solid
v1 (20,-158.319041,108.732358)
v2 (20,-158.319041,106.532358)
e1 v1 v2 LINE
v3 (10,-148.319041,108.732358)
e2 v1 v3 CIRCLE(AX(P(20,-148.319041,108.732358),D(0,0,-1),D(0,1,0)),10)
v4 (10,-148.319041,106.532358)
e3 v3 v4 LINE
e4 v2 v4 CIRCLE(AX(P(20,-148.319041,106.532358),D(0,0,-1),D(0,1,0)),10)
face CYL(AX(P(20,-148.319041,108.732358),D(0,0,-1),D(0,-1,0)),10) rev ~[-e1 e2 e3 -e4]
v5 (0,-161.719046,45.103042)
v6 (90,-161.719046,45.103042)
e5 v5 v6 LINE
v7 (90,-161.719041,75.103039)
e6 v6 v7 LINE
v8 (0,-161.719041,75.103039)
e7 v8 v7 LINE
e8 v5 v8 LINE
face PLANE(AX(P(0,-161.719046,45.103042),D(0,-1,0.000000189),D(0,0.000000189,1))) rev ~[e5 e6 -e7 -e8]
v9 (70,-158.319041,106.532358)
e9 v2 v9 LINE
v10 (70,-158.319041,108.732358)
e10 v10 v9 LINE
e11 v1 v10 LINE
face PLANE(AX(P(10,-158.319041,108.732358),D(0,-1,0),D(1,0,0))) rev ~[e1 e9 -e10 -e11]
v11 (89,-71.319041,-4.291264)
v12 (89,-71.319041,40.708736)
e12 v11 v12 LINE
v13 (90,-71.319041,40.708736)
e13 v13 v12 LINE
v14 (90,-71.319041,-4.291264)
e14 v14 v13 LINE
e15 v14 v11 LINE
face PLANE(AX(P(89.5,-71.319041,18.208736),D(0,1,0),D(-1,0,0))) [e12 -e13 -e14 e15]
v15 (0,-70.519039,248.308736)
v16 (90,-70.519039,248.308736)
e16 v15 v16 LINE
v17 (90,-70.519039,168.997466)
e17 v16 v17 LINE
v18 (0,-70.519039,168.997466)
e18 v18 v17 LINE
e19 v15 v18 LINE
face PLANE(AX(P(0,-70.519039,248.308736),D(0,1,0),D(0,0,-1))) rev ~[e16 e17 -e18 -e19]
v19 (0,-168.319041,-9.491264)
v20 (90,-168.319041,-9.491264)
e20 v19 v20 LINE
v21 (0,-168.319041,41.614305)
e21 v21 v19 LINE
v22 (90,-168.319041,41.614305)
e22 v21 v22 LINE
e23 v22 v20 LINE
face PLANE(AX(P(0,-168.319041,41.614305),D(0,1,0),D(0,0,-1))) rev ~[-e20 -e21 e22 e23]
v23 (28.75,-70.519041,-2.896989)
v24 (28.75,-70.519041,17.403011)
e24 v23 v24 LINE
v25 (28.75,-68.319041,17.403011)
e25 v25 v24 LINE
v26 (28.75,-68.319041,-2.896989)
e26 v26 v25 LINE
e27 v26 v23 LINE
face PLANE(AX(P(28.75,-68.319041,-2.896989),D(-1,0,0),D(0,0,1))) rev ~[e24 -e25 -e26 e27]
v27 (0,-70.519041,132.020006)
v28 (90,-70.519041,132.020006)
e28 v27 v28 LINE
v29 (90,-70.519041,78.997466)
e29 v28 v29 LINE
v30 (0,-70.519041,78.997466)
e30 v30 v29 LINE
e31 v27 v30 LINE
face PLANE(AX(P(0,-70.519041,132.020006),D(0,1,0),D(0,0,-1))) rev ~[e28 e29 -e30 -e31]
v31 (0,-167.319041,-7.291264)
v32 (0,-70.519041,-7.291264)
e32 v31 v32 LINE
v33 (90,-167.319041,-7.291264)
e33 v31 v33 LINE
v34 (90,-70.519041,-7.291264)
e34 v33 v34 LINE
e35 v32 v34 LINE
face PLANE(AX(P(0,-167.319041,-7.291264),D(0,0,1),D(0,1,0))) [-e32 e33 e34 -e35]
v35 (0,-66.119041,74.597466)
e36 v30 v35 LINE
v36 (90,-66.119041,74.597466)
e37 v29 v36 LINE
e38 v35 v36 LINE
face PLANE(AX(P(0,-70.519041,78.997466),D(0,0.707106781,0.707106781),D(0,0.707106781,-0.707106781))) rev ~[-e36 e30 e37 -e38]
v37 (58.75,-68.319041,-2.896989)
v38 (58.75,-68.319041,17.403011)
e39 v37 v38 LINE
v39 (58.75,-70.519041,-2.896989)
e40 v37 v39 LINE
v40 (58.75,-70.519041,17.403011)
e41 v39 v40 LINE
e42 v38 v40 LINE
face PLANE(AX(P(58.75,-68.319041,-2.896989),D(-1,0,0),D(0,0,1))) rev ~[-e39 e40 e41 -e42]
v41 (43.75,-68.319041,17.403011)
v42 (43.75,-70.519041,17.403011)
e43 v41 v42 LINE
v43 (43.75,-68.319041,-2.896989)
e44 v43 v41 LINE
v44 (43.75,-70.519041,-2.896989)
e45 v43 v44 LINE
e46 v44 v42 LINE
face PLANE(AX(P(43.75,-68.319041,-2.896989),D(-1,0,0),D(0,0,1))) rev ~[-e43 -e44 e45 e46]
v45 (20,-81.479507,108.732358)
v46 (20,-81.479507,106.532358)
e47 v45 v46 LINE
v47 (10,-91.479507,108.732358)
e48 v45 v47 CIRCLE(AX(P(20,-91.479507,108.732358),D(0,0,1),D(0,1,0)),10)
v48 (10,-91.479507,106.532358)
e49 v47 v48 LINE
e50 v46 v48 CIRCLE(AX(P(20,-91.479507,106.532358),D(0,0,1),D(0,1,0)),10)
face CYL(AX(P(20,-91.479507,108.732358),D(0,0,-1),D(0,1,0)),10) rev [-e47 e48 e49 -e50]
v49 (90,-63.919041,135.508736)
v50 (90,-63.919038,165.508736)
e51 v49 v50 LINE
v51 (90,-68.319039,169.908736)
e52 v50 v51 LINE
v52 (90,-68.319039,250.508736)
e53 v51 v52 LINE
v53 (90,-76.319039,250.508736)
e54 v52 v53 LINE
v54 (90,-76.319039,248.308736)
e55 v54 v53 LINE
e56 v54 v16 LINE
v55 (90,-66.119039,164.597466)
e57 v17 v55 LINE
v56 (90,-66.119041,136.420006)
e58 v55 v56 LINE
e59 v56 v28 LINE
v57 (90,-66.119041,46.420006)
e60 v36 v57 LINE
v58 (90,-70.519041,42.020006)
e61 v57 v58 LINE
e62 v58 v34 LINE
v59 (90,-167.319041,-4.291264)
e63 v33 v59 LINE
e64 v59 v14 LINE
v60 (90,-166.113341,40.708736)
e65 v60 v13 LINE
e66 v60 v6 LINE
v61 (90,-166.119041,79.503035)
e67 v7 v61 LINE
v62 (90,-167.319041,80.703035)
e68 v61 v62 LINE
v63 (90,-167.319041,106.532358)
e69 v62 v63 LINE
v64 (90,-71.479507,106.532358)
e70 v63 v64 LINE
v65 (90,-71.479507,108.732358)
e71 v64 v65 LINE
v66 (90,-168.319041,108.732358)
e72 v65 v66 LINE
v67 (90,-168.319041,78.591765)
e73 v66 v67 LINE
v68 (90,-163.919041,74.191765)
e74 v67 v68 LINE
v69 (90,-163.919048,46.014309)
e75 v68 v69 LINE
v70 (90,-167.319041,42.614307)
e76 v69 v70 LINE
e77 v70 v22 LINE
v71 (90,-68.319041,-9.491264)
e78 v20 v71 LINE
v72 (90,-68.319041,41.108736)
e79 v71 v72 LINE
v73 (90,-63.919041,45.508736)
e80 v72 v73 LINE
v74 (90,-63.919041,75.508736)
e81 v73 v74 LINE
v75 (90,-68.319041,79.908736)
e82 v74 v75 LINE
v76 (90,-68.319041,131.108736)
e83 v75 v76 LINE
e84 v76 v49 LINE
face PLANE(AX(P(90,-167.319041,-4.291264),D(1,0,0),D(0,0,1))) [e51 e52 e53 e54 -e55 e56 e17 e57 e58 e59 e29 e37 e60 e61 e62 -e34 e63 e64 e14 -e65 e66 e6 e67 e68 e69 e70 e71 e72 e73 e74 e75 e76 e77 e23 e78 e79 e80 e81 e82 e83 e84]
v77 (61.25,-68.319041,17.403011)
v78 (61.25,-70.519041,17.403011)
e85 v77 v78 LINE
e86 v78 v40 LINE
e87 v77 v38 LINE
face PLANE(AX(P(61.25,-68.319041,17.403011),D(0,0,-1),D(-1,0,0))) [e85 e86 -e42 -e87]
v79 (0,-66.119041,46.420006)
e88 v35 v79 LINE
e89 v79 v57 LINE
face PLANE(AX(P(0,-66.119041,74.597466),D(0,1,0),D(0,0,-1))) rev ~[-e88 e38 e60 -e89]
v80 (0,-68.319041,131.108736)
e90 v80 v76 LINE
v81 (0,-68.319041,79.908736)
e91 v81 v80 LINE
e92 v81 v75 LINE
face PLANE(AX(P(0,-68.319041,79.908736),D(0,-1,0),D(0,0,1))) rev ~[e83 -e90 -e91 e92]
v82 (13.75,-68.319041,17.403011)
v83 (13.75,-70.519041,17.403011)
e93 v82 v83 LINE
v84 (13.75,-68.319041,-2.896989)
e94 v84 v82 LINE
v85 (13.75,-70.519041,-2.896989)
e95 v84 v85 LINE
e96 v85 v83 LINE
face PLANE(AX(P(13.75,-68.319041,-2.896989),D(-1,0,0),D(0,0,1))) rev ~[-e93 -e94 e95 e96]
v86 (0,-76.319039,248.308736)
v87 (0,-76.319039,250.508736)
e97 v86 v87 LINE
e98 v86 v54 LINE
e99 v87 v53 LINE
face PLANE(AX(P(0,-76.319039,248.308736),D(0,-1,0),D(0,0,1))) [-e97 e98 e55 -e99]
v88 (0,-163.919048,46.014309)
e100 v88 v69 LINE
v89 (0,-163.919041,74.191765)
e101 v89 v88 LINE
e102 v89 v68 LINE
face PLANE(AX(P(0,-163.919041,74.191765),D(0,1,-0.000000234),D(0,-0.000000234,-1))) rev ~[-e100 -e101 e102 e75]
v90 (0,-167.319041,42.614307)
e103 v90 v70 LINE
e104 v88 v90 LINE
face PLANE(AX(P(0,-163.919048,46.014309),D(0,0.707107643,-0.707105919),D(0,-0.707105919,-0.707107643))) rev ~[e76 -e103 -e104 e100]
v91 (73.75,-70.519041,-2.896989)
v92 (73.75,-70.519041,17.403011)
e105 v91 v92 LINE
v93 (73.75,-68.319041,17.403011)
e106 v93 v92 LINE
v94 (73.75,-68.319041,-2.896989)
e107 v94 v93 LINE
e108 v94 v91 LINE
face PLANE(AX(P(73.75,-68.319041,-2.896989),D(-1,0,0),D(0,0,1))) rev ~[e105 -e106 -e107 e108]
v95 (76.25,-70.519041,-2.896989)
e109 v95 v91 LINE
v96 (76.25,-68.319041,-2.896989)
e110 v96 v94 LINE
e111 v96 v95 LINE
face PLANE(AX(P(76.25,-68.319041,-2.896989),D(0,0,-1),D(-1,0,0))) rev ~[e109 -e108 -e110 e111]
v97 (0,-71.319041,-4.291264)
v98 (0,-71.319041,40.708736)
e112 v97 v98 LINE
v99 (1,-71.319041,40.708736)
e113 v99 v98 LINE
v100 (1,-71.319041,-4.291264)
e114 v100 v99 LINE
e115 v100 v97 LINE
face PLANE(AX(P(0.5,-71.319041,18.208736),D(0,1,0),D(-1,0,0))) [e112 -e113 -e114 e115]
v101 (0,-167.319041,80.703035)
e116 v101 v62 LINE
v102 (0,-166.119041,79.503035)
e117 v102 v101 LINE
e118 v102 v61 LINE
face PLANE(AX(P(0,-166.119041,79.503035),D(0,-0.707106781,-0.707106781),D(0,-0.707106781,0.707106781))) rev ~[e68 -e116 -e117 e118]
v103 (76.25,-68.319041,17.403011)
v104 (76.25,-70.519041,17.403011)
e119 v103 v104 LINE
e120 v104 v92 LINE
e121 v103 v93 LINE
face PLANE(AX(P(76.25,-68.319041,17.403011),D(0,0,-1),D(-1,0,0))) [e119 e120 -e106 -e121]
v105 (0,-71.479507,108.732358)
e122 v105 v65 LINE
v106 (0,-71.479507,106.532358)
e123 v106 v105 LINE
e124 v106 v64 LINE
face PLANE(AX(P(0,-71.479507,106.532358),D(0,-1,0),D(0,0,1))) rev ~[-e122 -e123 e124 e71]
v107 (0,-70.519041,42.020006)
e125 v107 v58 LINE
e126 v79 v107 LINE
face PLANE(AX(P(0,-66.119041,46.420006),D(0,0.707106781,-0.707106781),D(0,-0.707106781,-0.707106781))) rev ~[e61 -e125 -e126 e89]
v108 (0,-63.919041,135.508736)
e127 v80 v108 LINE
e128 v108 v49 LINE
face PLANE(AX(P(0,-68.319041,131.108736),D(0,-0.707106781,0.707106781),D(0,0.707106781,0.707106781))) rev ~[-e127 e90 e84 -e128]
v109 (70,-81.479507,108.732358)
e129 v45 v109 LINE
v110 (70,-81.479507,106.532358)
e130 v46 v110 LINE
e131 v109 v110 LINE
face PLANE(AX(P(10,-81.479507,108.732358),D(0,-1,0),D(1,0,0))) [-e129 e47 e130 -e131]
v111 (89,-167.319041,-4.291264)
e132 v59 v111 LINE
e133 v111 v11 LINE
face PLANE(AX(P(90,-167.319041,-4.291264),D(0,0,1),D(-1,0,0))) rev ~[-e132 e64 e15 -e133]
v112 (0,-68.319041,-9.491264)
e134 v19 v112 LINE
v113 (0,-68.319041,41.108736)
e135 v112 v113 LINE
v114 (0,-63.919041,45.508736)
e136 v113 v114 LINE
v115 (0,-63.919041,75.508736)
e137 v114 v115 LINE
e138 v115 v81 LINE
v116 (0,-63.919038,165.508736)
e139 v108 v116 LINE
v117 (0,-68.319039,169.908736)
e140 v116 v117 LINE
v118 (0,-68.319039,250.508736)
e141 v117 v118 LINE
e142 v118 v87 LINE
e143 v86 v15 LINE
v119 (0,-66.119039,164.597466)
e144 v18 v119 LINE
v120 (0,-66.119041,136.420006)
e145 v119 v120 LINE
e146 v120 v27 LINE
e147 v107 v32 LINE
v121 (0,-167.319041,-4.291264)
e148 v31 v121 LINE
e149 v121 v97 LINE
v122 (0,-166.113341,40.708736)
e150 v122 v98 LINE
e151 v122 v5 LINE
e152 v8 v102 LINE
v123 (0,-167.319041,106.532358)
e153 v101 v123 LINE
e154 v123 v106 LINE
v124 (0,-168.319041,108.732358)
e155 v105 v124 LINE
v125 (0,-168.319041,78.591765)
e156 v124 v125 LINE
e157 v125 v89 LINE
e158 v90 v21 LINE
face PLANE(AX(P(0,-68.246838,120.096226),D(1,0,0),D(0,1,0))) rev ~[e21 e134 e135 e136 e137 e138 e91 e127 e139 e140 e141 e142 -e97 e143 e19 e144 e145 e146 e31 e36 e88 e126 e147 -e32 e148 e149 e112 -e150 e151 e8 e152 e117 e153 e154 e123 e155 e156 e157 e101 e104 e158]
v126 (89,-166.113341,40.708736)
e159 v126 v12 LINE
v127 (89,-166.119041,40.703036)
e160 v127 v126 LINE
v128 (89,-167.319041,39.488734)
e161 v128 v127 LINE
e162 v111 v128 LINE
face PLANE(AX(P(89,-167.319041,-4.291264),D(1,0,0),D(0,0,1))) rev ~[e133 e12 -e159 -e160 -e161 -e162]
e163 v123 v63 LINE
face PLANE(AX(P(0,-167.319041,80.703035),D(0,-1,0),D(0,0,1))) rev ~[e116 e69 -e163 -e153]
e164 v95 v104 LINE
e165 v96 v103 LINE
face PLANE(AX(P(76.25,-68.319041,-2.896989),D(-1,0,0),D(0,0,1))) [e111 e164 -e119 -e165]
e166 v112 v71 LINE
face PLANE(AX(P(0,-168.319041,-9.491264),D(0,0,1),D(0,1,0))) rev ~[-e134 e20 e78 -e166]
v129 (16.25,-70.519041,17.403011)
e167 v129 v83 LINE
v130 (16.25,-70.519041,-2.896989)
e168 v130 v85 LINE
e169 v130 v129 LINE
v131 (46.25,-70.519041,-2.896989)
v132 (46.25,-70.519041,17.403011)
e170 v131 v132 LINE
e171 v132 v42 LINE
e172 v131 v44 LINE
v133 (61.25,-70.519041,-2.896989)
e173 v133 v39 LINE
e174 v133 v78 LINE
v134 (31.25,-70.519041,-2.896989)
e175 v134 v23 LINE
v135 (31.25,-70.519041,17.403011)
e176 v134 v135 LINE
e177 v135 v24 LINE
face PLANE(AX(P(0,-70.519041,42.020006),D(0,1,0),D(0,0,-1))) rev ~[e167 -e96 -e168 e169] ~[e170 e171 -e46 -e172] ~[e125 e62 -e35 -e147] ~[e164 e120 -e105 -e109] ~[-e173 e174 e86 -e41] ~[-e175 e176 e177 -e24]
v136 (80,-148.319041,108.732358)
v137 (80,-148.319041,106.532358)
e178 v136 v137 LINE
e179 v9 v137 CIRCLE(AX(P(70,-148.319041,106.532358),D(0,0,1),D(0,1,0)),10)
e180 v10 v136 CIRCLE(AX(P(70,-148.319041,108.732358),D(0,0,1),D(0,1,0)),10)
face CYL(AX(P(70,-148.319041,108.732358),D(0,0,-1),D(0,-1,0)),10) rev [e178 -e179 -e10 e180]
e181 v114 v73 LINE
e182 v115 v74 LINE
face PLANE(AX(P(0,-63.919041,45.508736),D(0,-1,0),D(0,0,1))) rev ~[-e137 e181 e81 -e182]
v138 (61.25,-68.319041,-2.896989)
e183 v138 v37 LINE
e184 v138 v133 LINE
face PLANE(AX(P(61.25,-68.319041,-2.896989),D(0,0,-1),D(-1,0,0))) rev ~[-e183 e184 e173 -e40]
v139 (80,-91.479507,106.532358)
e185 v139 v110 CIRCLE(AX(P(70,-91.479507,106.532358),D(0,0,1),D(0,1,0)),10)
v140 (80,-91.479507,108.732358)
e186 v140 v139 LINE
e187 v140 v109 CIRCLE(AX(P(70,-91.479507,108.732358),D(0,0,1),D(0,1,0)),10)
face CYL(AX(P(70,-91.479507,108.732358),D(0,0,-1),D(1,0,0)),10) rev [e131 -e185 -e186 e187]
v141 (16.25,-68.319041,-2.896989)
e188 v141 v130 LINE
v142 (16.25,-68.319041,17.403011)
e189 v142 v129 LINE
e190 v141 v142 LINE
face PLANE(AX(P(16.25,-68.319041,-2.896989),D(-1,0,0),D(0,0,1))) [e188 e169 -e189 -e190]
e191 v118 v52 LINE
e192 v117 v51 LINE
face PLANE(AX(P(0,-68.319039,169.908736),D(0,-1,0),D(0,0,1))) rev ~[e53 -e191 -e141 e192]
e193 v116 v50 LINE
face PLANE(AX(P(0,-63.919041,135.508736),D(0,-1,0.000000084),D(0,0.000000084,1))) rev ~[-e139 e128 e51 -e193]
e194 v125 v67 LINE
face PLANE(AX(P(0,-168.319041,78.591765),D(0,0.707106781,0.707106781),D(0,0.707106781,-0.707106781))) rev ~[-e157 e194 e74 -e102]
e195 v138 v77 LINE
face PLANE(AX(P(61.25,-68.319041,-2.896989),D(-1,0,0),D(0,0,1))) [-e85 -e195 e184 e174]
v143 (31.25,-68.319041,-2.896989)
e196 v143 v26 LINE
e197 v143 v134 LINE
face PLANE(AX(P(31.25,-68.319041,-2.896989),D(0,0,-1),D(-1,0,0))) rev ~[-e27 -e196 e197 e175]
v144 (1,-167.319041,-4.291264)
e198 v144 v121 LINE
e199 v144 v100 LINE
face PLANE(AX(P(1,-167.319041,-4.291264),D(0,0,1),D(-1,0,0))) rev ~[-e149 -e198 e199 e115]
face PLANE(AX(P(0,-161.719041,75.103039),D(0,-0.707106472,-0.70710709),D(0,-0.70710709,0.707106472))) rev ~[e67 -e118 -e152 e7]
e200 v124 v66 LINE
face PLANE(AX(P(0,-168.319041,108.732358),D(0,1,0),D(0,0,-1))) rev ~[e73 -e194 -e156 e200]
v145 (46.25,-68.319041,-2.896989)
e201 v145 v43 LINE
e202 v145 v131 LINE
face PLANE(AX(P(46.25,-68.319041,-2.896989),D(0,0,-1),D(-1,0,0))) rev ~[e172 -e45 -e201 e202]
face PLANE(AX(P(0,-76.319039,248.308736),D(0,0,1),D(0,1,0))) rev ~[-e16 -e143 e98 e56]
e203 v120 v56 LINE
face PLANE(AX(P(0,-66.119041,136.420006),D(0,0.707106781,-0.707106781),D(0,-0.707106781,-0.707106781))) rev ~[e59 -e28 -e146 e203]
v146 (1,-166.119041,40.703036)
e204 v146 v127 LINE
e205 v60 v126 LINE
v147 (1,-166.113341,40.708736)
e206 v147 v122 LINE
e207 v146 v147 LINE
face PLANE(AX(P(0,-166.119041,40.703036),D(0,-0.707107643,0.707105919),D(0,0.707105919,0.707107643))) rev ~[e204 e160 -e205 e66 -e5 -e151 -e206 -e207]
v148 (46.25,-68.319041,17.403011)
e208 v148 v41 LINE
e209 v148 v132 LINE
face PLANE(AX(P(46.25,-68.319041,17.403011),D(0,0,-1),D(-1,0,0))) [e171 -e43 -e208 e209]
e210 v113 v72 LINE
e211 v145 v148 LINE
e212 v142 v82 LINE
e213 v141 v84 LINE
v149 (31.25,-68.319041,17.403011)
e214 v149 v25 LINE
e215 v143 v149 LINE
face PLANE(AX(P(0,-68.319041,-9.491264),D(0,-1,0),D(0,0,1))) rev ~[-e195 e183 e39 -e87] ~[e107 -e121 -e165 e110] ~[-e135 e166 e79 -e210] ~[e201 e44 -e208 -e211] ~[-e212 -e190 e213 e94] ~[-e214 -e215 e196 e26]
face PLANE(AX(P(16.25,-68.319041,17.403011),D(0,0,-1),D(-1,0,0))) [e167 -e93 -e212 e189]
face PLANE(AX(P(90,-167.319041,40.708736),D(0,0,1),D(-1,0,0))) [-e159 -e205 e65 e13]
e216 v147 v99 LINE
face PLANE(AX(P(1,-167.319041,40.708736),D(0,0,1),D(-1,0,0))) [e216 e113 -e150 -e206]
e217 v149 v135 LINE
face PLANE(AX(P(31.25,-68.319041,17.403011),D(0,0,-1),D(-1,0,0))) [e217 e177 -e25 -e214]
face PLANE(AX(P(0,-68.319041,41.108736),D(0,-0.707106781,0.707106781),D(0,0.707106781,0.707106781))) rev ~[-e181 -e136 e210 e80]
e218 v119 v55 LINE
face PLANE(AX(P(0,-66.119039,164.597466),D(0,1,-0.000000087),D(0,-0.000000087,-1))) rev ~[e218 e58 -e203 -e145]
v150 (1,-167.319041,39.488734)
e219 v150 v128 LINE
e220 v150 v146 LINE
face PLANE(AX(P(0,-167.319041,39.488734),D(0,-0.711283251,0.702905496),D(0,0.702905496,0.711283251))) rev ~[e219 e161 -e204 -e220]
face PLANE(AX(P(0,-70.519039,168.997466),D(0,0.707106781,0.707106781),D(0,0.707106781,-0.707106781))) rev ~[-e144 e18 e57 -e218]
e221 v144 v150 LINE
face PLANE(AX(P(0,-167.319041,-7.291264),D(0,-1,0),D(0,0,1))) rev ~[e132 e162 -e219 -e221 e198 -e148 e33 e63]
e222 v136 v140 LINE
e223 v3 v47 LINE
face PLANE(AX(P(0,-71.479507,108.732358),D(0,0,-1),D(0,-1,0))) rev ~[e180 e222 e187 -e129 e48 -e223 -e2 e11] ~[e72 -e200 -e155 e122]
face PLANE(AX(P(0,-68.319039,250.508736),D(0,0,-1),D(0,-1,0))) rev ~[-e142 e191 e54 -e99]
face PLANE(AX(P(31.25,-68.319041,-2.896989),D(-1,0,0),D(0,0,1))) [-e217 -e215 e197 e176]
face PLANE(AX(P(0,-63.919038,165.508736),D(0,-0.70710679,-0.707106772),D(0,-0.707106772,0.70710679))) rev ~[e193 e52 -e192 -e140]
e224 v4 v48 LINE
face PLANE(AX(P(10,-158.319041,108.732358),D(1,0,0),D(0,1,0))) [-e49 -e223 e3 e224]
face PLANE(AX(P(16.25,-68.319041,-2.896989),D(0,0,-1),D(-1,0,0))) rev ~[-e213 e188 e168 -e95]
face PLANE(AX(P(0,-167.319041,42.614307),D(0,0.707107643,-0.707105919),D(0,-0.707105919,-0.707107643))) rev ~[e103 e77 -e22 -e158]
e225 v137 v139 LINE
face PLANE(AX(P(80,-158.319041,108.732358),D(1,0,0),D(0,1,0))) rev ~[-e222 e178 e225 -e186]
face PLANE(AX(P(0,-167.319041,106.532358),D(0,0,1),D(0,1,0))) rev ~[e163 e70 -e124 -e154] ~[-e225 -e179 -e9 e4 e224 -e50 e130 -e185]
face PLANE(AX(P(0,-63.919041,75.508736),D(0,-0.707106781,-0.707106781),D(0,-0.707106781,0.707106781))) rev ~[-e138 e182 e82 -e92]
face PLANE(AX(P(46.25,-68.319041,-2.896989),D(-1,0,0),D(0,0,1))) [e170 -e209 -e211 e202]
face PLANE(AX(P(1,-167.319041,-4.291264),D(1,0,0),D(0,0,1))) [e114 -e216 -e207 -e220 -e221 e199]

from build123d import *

# Parameters (mm, degrees)
F0_W     = 96.8
F0_H     = 2.2
F0_W_2   = 2.2
F0_W_3   = 1
F0_W_4   = 5.8
F0_W_5   = 95.8395342231
F1_DEPTH = 90
F2_W     = 1
F2_H     = 45
F3_DEPTH = 96
F4_W     = 70
F4_H     = 76.8395342231
F5_DEPTH = 25
F6_R     = 10
F7_W     = 2.5
F7_H     = 20.3
F8_DEPTH = 25


# Not quite as in the source:
# - ends of sketch curves that miss each other by under 0.0002 mm in the source are joined


with BuildPart() as f1:
    # F0 (on Right) → F1 (new body)
    with BuildSketch(Plane.YZ):
        Polygon((-70.5190410137, 78.9974663137), (-66.1190410137, 74.5974663137), (-66.1190410137, 46.4200059881), (-70.5190410137, 42.0200059881), (-70.5190410137, -7.2912638491), (-68.3190410137, -7.2912638491), (-68.3190410137, 41.1087361509), (-63.9190410137, 45.5087361509), (-63.9190410137, 75.5087361509), (-68.3190410137, 79.9087361509), (-68.3190410137, 131.1087361509), (-63.9190410137, 135.5087361509), (-63.9190384975, 165.5087359606), (-68.3190385763, 169.9087361509), (-68.3190385763, 240.5087361509), (-68.3190385763, 248.3087361509), (-70.5190385763, 248.3087361509), (-70.5190385763, 238.3087361509), (-70.5190385763, 168.9974663137), (-66.1190385763, 164.5974663137), (-66.1190410137, 136.4200059881), (-70.5190410137, 132.0200059881), align=None)
        with Locations((-118.9190410137, -8.3912638491)):
            Rectangle(F0_W, F0_H)
        with Locations((-69.4190410137, -8.3912638491)):
            Rectangle(F0_W_2, F0_H)
        Polygon((-168.3190410137, -7.2912638491), (-167.3190410137, -7.2912638491), (-167.3190410137, 39.4887340454), (-168.3190410137, 38.4768152958), align=None)
        with Locations((-167.8190410137, -8.3912638491)):
            Rectangle(F0_W_3, F0_H)
        Polygon((-168.3190410137, 38.4768152958), (-167.3190410137, 39.4887340454), (-167.3190410137, 42.6143072478), (-168.3190410137, 41.6143048104), align=None)
        Polygon((-167.3190410137, 42.6143072478), (-167.3190410137, 39.4887340454), (-166.1190411219, 40.7030364356), (-161.7190464841, 45.1030417978), (-161.7190408009, 75.1030386029), (-166.1190410137, 79.5030349731), (-167.3190410137, 80.7030349731), (-167.3190410137, 77.5917651359), (-163.9190410137, 74.1917651359), (-163.9190475947, 46.0143089539), align=None)
        with Locations((-73.4190385763, 249.4087361509)):
            Rectangle(F0_W_4, F0_H)
        with Locations((-69.4190385763, 249.4087361509)):
            Rectangle(F0_W_2, F0_H)
        Polygon((-168.3190410137, 78.5917651359), (-167.3190410137, 77.5917651359), (-167.3190410137, 80.7030349731), (-168.3190410137, 81.7030349731), align=None)
        Polygon((-168.3190410137, 81.7030349731), (-167.3190410137, 80.7030349731), (-167.3190410137, 106.5323576331), (-168.3190410137, 106.5323576331), align=None)
        with Locations((-167.8190410137, 107.6323576331)):
            Rectangle(F0_W_3, F0_H)
        with Locations((-119.3992739022, 107.6323576331)):
            Rectangle(F0_W_5, F0_H)
    extrude(amount=F1_DEPTH)

    # F2 (on face) → F3 (join)
    with BuildSketch(Plane(origin=(0, -167.3190410137, 0), x_dir=(-1, 0, 0), z_dir=(0, 1, 0))):
        with Locations((-89.5, 18.2087361509)):
            Rectangle(F2_W, F2_H)
        with Locations((-0.5, 18.2087361509)):
            Rectangle(F2_W, F2_H)
    extrude(amount=F3_DEPTH)

    # F4 (on face) → F5 (cut)
    with BuildSketch(Plane.XY.offset(108.7323576331)):
        with Locations((45, -119.8992739022)):
            Rectangle(F4_W, F4_H)
    extrude(amount=-F5_DEPTH, mode=Mode.SUBTRACT)

    # F6
    f6_edges = [f1.edges().sort_by_distance(p)[0] for p in [
        (10, -81.479507, 107.632358),
        (10, -158.319041, 107.632358),
        (80, -81.479507, 107.632358),
        (80, -158.319041, 107.632358),
    ]]
    fillet(f6_edges, radius=F6_R)

    # F7 (on face) → F8 (cut)
    with BuildSketch(Plane(origin=(0, -68.3190410137, 0), x_dir=(-1, 0, 0), z_dir=(0, 1, 0))):
        with Locations((-75, 7.2530107699)):
            Rectangle(F7_W, F7_H)
        with Locations((-60, 7.2530107699)):
            Rectangle(F7_W, F7_H)
        with Locations((-45, 7.2530107699)):
            Rectangle(F7_W, F7_H)
        with Locations((-30, 7.2530107699)):
            Rectangle(F7_W, F7_H)
        with Locations((-15, 7.2530107699)):
            Rectangle(F7_W, F7_H)
    extrude(amount=-F8_DEPTH, mode=Mode.SUBTRACT)


solid = f1.part
